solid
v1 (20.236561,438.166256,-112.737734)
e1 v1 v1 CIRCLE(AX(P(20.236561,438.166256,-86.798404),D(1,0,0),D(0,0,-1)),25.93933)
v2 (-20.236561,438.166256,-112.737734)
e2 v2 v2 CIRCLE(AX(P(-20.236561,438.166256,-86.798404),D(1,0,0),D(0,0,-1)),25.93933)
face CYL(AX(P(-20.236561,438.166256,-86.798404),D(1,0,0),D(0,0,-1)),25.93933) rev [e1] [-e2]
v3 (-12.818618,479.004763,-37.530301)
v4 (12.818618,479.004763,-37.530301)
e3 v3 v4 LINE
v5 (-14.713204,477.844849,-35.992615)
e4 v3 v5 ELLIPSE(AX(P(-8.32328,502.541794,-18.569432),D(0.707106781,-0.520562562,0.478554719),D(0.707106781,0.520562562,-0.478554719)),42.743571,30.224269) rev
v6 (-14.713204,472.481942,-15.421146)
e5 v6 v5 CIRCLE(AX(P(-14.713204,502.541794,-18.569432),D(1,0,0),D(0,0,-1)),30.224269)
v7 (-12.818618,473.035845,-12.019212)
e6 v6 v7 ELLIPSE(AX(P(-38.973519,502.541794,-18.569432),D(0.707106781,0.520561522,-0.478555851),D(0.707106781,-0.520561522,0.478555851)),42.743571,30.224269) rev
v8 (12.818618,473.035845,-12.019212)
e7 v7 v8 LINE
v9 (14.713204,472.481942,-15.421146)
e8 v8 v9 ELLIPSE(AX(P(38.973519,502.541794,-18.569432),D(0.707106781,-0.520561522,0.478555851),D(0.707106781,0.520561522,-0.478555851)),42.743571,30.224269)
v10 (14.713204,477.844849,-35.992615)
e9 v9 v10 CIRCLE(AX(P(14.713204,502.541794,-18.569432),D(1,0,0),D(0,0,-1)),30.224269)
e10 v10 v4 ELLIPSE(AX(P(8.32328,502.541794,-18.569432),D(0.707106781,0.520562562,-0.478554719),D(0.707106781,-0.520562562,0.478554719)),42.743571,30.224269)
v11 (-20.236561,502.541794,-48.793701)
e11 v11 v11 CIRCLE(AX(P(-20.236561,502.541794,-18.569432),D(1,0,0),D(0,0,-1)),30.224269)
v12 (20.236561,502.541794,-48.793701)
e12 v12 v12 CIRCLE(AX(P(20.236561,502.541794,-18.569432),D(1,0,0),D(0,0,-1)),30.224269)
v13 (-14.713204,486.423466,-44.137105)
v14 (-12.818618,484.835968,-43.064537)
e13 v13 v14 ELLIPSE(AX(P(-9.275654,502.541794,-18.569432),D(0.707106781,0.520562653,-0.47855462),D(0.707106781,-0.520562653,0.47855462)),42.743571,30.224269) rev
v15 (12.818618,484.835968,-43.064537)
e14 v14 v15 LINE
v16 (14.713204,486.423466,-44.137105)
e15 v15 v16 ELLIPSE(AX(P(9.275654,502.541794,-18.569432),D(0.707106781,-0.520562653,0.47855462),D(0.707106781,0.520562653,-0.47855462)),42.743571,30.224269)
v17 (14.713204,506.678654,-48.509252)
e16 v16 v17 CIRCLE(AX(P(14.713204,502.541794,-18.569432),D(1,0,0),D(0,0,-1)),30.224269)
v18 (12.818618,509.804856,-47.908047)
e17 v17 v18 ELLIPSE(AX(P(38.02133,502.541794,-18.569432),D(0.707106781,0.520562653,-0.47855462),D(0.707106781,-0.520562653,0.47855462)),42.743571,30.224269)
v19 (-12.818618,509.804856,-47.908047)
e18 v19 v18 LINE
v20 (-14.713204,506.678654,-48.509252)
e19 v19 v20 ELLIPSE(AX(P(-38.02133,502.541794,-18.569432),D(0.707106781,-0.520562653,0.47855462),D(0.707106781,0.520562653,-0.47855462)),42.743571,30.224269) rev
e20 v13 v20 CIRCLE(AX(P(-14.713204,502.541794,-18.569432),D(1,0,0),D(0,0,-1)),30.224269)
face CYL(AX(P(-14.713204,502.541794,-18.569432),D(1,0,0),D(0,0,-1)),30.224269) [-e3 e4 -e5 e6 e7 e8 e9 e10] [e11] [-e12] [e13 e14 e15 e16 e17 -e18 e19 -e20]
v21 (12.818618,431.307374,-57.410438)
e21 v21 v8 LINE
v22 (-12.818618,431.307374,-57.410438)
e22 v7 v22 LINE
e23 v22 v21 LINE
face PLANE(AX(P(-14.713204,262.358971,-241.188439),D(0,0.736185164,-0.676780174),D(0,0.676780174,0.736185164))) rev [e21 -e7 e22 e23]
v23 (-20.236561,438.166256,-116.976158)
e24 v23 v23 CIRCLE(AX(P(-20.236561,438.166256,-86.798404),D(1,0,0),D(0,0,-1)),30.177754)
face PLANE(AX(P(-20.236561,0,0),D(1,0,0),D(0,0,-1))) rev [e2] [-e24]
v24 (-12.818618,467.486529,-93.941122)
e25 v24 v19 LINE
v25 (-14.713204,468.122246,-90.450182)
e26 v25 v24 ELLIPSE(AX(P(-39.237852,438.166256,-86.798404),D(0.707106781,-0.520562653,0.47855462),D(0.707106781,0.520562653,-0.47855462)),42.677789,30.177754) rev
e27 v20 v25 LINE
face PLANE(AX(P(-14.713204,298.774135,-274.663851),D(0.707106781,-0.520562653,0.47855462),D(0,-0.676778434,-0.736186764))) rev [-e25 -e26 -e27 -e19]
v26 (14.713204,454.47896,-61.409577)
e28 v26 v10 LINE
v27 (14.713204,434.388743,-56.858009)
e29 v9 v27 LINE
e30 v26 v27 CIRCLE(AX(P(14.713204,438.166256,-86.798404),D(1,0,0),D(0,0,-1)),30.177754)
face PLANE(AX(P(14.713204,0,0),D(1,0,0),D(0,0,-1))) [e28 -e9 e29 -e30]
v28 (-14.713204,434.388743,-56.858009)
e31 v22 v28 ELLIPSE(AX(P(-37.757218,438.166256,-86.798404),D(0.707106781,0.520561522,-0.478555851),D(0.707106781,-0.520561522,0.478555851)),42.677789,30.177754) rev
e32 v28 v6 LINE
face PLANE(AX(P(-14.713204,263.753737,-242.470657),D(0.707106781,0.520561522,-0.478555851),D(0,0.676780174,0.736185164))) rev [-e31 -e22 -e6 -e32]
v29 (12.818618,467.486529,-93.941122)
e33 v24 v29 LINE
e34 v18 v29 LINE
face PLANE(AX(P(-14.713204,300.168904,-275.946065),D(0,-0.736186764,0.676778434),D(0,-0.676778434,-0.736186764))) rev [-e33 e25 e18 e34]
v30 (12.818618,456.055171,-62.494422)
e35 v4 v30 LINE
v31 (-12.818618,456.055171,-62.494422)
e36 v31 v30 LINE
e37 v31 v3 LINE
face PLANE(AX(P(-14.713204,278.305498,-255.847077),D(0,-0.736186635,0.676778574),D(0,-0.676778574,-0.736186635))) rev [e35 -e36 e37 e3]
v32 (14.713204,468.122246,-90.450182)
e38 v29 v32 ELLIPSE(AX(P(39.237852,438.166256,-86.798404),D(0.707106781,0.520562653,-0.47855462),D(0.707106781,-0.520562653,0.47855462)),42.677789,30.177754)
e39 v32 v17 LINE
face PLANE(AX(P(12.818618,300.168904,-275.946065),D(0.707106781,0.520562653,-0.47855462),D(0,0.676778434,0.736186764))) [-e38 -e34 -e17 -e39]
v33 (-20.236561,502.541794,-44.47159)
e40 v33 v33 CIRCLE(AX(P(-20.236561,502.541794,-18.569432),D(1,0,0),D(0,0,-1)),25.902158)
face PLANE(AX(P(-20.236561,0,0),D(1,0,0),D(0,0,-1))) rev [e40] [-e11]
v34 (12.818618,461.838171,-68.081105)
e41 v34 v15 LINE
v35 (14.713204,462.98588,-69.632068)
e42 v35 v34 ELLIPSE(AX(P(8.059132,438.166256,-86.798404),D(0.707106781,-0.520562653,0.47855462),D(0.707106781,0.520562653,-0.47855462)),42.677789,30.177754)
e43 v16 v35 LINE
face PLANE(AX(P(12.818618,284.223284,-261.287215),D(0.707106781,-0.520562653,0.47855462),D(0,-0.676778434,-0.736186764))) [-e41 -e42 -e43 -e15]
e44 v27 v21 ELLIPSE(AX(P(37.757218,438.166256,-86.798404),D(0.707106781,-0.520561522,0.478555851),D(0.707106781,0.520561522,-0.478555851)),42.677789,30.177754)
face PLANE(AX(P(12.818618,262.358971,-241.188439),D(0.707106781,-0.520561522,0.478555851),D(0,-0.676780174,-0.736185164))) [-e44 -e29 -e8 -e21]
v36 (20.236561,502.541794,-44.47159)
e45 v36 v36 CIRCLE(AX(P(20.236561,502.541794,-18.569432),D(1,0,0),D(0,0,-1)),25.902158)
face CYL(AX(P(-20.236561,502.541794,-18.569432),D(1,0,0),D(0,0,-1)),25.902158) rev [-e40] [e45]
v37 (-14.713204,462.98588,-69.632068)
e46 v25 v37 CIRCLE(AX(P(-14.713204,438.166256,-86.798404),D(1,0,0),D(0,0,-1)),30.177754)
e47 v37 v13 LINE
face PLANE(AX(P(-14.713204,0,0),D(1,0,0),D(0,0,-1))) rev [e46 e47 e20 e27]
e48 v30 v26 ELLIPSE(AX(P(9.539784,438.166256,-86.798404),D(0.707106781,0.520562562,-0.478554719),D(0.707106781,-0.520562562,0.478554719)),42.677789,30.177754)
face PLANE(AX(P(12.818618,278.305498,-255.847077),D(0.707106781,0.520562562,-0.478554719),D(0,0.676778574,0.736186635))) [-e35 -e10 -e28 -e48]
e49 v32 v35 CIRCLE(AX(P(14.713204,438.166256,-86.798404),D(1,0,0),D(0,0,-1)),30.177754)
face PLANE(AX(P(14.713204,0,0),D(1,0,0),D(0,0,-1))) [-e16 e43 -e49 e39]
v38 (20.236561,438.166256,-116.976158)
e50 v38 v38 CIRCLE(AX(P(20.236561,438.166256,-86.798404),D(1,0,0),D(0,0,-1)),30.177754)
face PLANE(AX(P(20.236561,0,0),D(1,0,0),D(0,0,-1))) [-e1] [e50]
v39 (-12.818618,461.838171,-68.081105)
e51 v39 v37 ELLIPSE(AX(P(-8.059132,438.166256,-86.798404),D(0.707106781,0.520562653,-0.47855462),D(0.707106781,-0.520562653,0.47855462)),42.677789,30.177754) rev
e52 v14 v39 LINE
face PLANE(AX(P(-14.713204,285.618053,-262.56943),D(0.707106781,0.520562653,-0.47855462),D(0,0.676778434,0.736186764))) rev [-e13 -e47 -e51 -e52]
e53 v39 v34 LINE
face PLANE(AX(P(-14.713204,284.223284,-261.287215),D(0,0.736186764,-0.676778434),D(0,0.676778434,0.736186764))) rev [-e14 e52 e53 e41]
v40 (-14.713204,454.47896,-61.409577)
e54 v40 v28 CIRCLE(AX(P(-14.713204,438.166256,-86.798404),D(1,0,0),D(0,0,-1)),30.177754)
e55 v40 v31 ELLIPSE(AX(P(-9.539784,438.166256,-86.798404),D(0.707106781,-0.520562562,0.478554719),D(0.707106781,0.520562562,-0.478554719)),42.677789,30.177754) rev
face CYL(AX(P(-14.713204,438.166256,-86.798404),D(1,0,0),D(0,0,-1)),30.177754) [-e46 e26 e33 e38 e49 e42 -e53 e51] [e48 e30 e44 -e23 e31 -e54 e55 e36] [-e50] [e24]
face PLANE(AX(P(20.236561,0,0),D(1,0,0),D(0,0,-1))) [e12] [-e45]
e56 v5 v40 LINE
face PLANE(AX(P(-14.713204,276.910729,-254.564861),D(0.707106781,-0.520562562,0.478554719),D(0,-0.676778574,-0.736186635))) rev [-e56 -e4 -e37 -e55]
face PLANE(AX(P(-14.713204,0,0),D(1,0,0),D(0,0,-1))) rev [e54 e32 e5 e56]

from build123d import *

# Parameters (mm, degrees)
BOSS_EXTRUDE2_DEPTH      = 14.713204
BOSS_EXTRUDE2_DEPTH_BACK = 14.713204
BOSS_EXTRUDE3_DEPTH      = 20.236561
BOSS_EXTRUDE3_DEPTH_BACK = 20.236561
SKETCH2_R                = 25.902158
SKETCH2_R_2              = 25.939329669
CUT_EXTRUDE1_DEPTH       = 547.956280292
CHAMFER1_SIZE            = 1.894586


with BuildPart() as part:
    # Sketch1 → Boss-Extrude2 (new, two sides: drawn at the far end of the back side and taken through both)
    with BuildSketch(Plane(origin=(0, 0, 0), x_dir=(0, 0, -1), z_dir=(1, 0, 0)).offset(-BOSS_EXTRUDE2_DEPTH_BACK)):
        with BuildLine():
            ThreePointArc((37.530301218, 479.004762545), (25.455145516, 473.112329842), (12.01921241, 473.035844862))
            Line((12.01921241, 473.035844862), (57.410437724, 431.307373701))
            ThreePointArc((57.410437724, 431.307373701), (57.237962601, 444.238910489), (62.494422204, 456.05517148))
            Line((62.494422204, 456.05517148), (37.530301218, 479.004762545))
        make_face()
        with BuildLine():
            Line((93.941121838, 467.486529022), (47.908047204, 509.804855969))
            ThreePointArc((47.908047204, 509.804855969), (48.571470239, 506.200224369), (48.793700581, 502.541794))
            ThreePointArc((48.793700581, 502.541794), (47.325762011, 493.23696216), (43.064536592, 484.835968341))
            Line((43.064536592, 484.835968341), (68.081105171, 461.838170852))
            ThreePointArc((68.081105171, 461.838170852), (80.358782988, 467.648930733), (93.941121838, 467.486529022))
        make_face()
        with BuildLine():
            Line((0.348742, 483.76459), (12.01921241, 473.035844862))
            ThreePointArc((12.01921241, 473.035844862), (25.455145516, 473.112329842), (37.530301218, 479.004762545))
            Line((37.530301218, 479.004762545), (15.677896, 499.093744))
            Line((15.677896, 499.093744), (0.348742, 483.76459))
        make_face()
        with BuildLine():
            Line((47.908047204, 509.804855969), (36.696142, 520.11199))
            Line((36.696142, 520.11199), (21.366988, 504.782582))
            Line((21.366988, 504.782582), (43.064536592, 484.835968341))
            ThreePointArc((43.064536592, 484.835968341), (47.325762011, 493.23696216), (48.793700581, 502.541794))
            ThreePointArc((48.793700581, 502.541794), (48.571470239, 506.200224369), (47.908047204, 509.804855969))
        make_face()
        with BuildLine():
            Line((21.366988, 504.782582), (36.696142, 520.11199))
            Line((36.696142, 520.11199), (47.908047204, 509.804855969))
            ThreePointArc((47.908047204, 509.804855969), (-3.059663869, 523.653132734), (12.01921241, 473.035844862))
            Line((12.01921241, 473.035844862), (0.348742, 483.76459))
            Line((0.348742, 483.76459), (15.677896, 499.093744))
            Line((15.677896, 499.093744), (37.530301218, 479.004762545))
            ThreePointArc((37.530301218, 479.004762545), (40.492163472, 481.735538786), (43.064536592, 484.835968341))
            Line((43.064536592, 484.835968341), (21.366988, 504.782582))
        make_face()
        with BuildLine():
            ThreePointArc((116.976157863, 438.166256), (110.528637975, 456.809561064), (93.941121838, 467.486529022))
            Line((93.941121838, 467.486529022), (94.929198, 466.578188))
            Line((94.929198, 466.578188), (79.600044, 451.24878))
            Line((79.600044, 451.24878), (68.081105171, 461.838170852))
            ThreePointArc((68.081105171, 461.838170852), (65.094293396, 459.13357369), (62.494422204, 456.05517148))
            Line((62.494422204, 456.05517148), (73.911206, 445.559688))
            Line((73.911206, 445.559688), (58.581798, 430.230534))
            Line((58.581798, 430.230534), (57.410437724, 431.307373701))
            ThreePointArc((57.410437724, 431.307373701), (90.250505926, 408.186599222), (116.976157863, 438.166256))
        make_face()
        with BuildLine():
            Line((94.929198, 466.578188), (93.941121838, 467.486529022))
            ThreePointArc((93.941121838, 467.486529022), (80.358782988, 467.648930733), (68.081105171, 461.838170852))
            Line((68.081105171, 461.838170852), (79.600044, 451.24878))
            Line((79.600044, 451.24878), (94.929198, 466.578188))
        make_face()
        with BuildLine():
            ThreePointArc((62.494422204, 456.05517148), (57.237962601, 444.238910489), (57.410437724, 431.307373701))
            Line((57.410437724, 431.307373701), (58.581798, 430.230534))
            Line((58.581798, 430.230534), (73.911206, 445.559688))
            Line((73.911206, 445.559688), (62.494422204, 456.05517148))
        make_face()
    extrude(amount=BOSS_EXTRUDE2_DEPTH + BOSS_EXTRUDE2_DEPTH_BACK)

    # Sketch1<3> → Boss-Extrude3 (add, two sides: drawn at the far end of the back side and taken through both)
    with BuildSketch(Plane(origin=(0, 0, 0), x_dir=(0, 0, -1), z_dir=(1, 0, 0)).offset(-BOSS_EXTRUDE3_DEPTH_BACK)):
        with BuildLine():
            Line((21.366988, 504.782582), (36.696142, 520.11199))
            Line((36.696142, 520.11199), (47.908047204, 509.804855969))
            ThreePointArc((47.908047204, 509.804855969), (-3.059663869, 523.653132734), (12.01921241, 473.035844862))
            Line((12.01921241, 473.035844862), (0.348742, 483.76459))
            Line((0.348742, 483.76459), (15.677896, 499.093744))
            Line((15.677896, 499.093744), (37.530301218, 479.004762545))
            ThreePointArc((37.530301218, 479.004762545), (40.492163472, 481.735538786), (43.064536592, 484.835968341))
            Line((43.064536592, 484.835968341), (21.366988, 504.782582))
        make_face()
        with BuildLine():
            ThreePointArc((116.976157863, 438.166256), (110.528637975, 456.809561064), (93.941121838, 467.486529022))
            Line((93.941121838, 467.486529022), (94.929198, 466.578188))
            Line((94.929198, 466.578188), (79.600044, 451.24878))
            Line((79.600044, 451.24878), (68.081105171, 461.838170852))
            ThreePointArc((68.081105171, 461.838170852), (65.094293396, 459.13357369), (62.494422204, 456.05517148))
            Line((62.494422204, 456.05517148), (73.911206, 445.559688))
            Line((73.911206, 445.559688), (58.581798, 430.230534))
            Line((58.581798, 430.230534), (57.410437724, 431.307373701))
            ThreePointArc((57.410437724, 431.307373701), (90.250505926, 408.186599222), (116.976157863, 438.166256))
        make_face()
        with BuildLine():
            ThreePointArc((62.494422204, 456.05517148), (57.237962601, 444.238910489), (57.410437724, 431.307373701))
            Line((57.410437724, 431.307373701), (58.581798, 430.230534))
            Line((58.581798, 430.230534), (73.911206, 445.559688))
            Line((73.911206, 445.559688), (62.494422204, 456.05517148))
        make_face()
        with BuildLine():
            Line((94.929198, 466.578188), (93.941121838, 467.486529022))
            ThreePointArc((93.941121838, 467.486529022), (80.358782988, 467.648930733), (68.081105171, 461.838170852))
            Line((68.081105171, 461.838170852), (79.600044, 451.24878))
            Line((79.600044, 451.24878), (94.929198, 466.578188))
        make_face()
        with BuildLine():
            Line((47.908047204, 509.804855969), (36.696142, 520.11199))
            Line((36.696142, 520.11199), (21.366988, 504.782582))
            Line((21.366988, 504.782582), (43.064536592, 484.835968341))
            ThreePointArc((43.064536592, 484.835968341), (47.325762011, 493.23696216), (48.793700581, 502.541794))
            ThreePointArc((48.793700581, 502.541794), (48.571470239, 506.200224369), (47.908047204, 509.804855969))
        make_face()
        with BuildLine():
            Line((0.348742, 483.76459), (12.01921241, 473.035844862))
            ThreePointArc((12.01921241, 473.035844862), (25.455145516, 473.112329842), (37.530301218, 479.004762545))
            Line((37.530301218, 479.004762545), (15.677896, 499.093744))
            Line((15.677896, 499.093744), (0.348742, 483.76459))
        make_face()
    extrude(amount=BOSS_EXTRUDE3_DEPTH + BOSS_EXTRUDE3_DEPTH_BACK)

    # Sketch2 → Cut-Extrude1 (cut, through all)
    with BuildSketch(Plane(origin=(20.236561, 0, 0), x_dir=(0, 0, -1), z_dir=(1, 0, 0))):
        with Locations((18.569432, 502.541794)):
            Circle(SKETCH2_R)
        with Locations((86.798404, 438.166256)):
            Circle(SKETCH2_R_2)
    extrude(amount=-CUT_EXTRUDE1_DEPTH, mode=Mode.SUBTRACT)

    # Chamfer1
    # the kernel refuses this chamfer: 1.894586 mm, written as the material it takes off along each edge
    with BuildSketch(Plane(origin=(-14.713204, 482.302213593, -33.943397788), x_dir=(0.9996219169112971, 0.0202420968703396, -0.018608620176565335), z_dir=(0, -0.6767785744793956, -0.7361866347100016))) as chamfer1_piece_1_section:
        Polygon((CHAMFER1_SIZE * 0.999621916911, CHAMFER1_SIZE * 0.0274958766106), (-CHAMFER1_SIZE * 0.0274958766106, CHAMFER1_SIZE * 0.999621916911), (0, 0), align=None)
    chamfer1_piece_1 = extrude(amount=43.654592913, mode=Mode.PRIVATE)
    chamfer1_piece_1 = chamfer1_piece_1 - Plane(origin=(-14.082586432, 438.166256, -86.798404), x_dir=(0, 0.7844160622334895, 0.6202349887825632), z_dir=(-1, 0, 0)) * Cylinder(30.177753863, 95, mode=Mode.PRIVATE)
    chamfer1_piece_1 = chamfer1_piece_1 - Plane(origin=(-14.082586432, 502.541794, -18.569432), x_dir=(0, -0.7787461057189721, -0.6273392246843295), z_dir=(-1, 0, 0)) * Cylinder(30.224268581, 95, mode=Mode.PRIVATE)
    add(chamfer1_piece_1, mode=Mode.SUBTRACT)
    with BuildSketch(Plane(origin=(14.713204, 513.102306333, -44.321143144), x_dir=(0.027495876610586445, -0.7359084240497759, 0.6765225555604119), z_dir=(0, -0.6767784340411219, -0.7361867638153017))) as chamfer1_piece_2_section:
        Polygon((CHAMFER1_SIZE * 0.999621916911, CHAMFER1_SIZE * 0.0274958766106), (-CHAMFER1_SIZE * 0.0274958766106, CHAMFER1_SIZE * 0.999621916911), (0, 0), align=None)
    chamfer1_piece_2 = extrude(amount=72.273620457, mode=Mode.PRIVATE)
    chamfer1_piece_2 = chamfer1_piece_2 - Plane(origin=(14.076738279, 438.166256, -86.798404), x_dir=(0, 0.7844160622334895, 0.6202349887825632), z_dir=(-1, 0, 0)) * Cylinder(30.177753863, 153, mode=Mode.PRIVATE)
    chamfer1_piece_2 = chamfer1_piece_2 - Plane(origin=(14.076738279, 502.541794, -18.569432), x_dir=(0, -0.7787461057189721, -0.6273392246843295), z_dir=(-1, 0, 0)) * Cylinder(30.224268581, 153, mode=Mode.PRIVATE)
    add(chamfer1_piece_2, mode=Mode.SUBTRACT)
    with BuildSketch(Plane(origin=(14.713204, 458.540720488, -71.668009231), x_dir=(-0.9996219169112969, -0.02024210042020755, 0.018608616315095913), z_dir=(0, 0.6767784340411188, 0.7361867638153047))) as chamfer1_piece_3_section:
        Polygon((CHAMFER1_SIZE * 0.999621916911, -CHAMFER1_SIZE * 0.0274958766106), (-CHAMFER1_SIZE * 0.0274958766106, -CHAMFER1_SIZE * 0.999621916911), (0, 0), align=None)
    chamfer1_piece_3 = extrude(amount=43.725829206, mode=Mode.PRIVATE)
    chamfer1_piece_3 = chamfer1_piece_3 - Plane(origin=(14.082637489, 438.166256, -86.798404), x_dir=(0, 0.7844160622334895, 0.6202349887825632), z_dir=(-1, 0, 0)) * Cylinder(30.177753863, 96, mode=Mode.PRIVATE)
    chamfer1_piece_3 = chamfer1_piece_3 - Plane(origin=(14.082637489, 502.541794, -18.569432), x_dir=(0, -0.7787461057189721, -0.6273392246843295), z_dir=(-1, 0, 0)) * Cylinder(30.224268581, 96, mode=Mode.PRIVATE)
    add(chamfer1_piece_3, mode=Mode.SUBTRACT)
    with BuildSketch(Plane(origin=(14.713204, 452.757720432, -66.081325634), x_dir=(-0.9996219169112969, 0.02024209687034323, -0.01860862017656867), z_dir=(0, 0.6767785744793956, 0.7361866347100016))) as chamfer1_piece_4_section:
        Polygon((CHAMFER1_SIZE * 0.999621916911, CHAMFER1_SIZE * 0.0274958766106), (-CHAMFER1_SIZE * 0.0274958766106, CHAMFER1_SIZE * 0.999621916911), (0, 0), align=None)
    chamfer1_piece_4 = extrude(amount=43.654592913, mode=Mode.PRIVATE)
    chamfer1_piece_4 = chamfer1_piece_4 - Plane(origin=(14.082586432, 438.166256, -86.798404), x_dir=(0, 0.7844160622334895, 0.6202349887825632), z_dir=(-1, 0, 0)) * Cylinder(30.177753863, 95, mode=Mode.PRIVATE)
    chamfer1_piece_4 = chamfer1_piece_4 - Plane(origin=(14.082586432, 502.541794, -18.569432), x_dir=(0, -0.7787461057189721, -0.6273392246843295), z_dir=(-1, 0, 0)) * Cylinder(30.224268581, 95, mode=Mode.PRIVATE)
    add(chamfer1_piece_4, mode=Mode.SUBTRACT)
    with BuildSketch(Plane(origin=(-14.713204, 464.189078658, -97.528025897), x_dir=(-0.0274958766105856, -0.735908424049776, 0.6765225555604119), z_dir=(0, 0.6767784340411219, 0.7361867638153017))) as chamfer1_piece_5_section:
        Polygon((CHAMFER1_SIZE * 0.999621916911, CHAMFER1_SIZE * 0.0274958766106), (-CHAMFER1_SIZE * 0.0274958766106, CHAMFER1_SIZE * 0.999621916911), (0, 0), align=None)
    chamfer1_piece_5 = extrude(amount=72.273620457, mode=Mode.PRIVATE)
    chamfer1_piece_5 = chamfer1_piece_5 - Plane(origin=(-14.076738279, 438.166256, -86.798404), x_dir=(0, 0.7844160622334895, 0.6202349887825632), z_dir=(-1, 0, 0)) * Cylinder(30.177753863, 153, mode=Mode.PRIVATE)
    chamfer1_piece_5 = chamfer1_piece_5 - Plane(origin=(-14.076738279, 502.541794, -18.569432), x_dir=(0, -0.7787461057189721, -0.6273392246843295), z_dir=(-1, 0, 0)) * Cylinder(30.224268581, 153, mode=Mode.PRIVATE)
    add(chamfer1_piece_5, mode=Mode.SUBTRACT)
    with BuildSketch(Plane(origin=(14.713204, 428.009914857, -60.997333989), x_dir=(-0.9996219169112965, -0.0202420564302285, 0.01860866416646602), z_dir=(0, 0.6767801743515941, 0.7361851639394983))) as chamfer1_piece_6_section:
        Polygon((CHAMFER1_SIZE * 0.999621916911, -CHAMFER1_SIZE * 0.0274958766106), (-CHAMFER1_SIZE * 0.0274958766106, -CHAMFER1_SIZE * 0.999621916911), (0, 0), align=None)
    chamfer1_piece_6 = extrude(amount=71.401897808, mode=Mode.PRIVATE)
    chamfer1_piece_6 = chamfer1_piece_6 - Plane(origin=(14.076843775, 438.166256, -86.798404), x_dir=(0, 0.7844160622334895, 0.6202349887825632), z_dir=(-1, 0, 0)) * Cylinder(30.177753863, 151, mode=Mode.PRIVATE)
    chamfer1_piece_6 = chamfer1_piece_6 - Plane(origin=(14.076843775, 502.541794, -18.569432), x_dir=(0, -0.7787461057189721, -0.6273392246843295), z_dir=(-1, 0, 0)) * Cylinder(30.224268581, 151, mode=Mode.PRIVATE)
    add(chamfer1_piece_6, mode=Mode.SUBTRACT)
    with BuildSketch(Plane(origin=(-14.713204, 476.333303705, -8.432316145), x_dir=(-0.027495876610586514, 0.7359068247788585, -0.6765242952129021), z_dir=(0, -0.6767801743515941, -0.7361851639394983))) as chamfer1_piece_7_section:
        Polygon((CHAMFER1_SIZE * 0.999621916911, CHAMFER1_SIZE * 0.0274958766106), (-CHAMFER1_SIZE * 0.0274958766106, CHAMFER1_SIZE * 0.999621916911), (0, 0), align=None)
    chamfer1_piece_7 = extrude(amount=71.401897808, mode=Mode.PRIVATE)
    chamfer1_piece_7 = chamfer1_piece_7 - Plane(origin=(-14.076843775, 438.166256, -86.798404), x_dir=(0, 0.7844160622334895, 0.6202349887825632), z_dir=(-1, 0, 0)) * Cylinder(30.177753863, 151, mode=Mode.PRIVATE)
    chamfer1_piece_7 = chamfer1_piece_7 - Plane(origin=(-14.076843775, 502.541794, -18.569432), x_dir=(0, -0.7787461057189721, -0.6273392246843295), z_dir=(-1, 0, 0)) * Cylinder(30.224268581, 151, mode=Mode.PRIVATE)
    add(chamfer1_piece_7, mode=Mode.SUBTRACT)
    with BuildSketch(Plane(origin=(-14.713204, 488.133418705, -39.477632533), x_dir=(0.999621916911297, -0.020242100420206275, 0.01860861631509474), z_dir=(0, -0.6767784340411188, -0.7361867638153047))) as chamfer1_piece_8_section:
        Polygon((CHAMFER1_SIZE * 0.999621916911, -CHAMFER1_SIZE * 0.0274958766106), (-CHAMFER1_SIZE * 0.0274958766106, -CHAMFER1_SIZE * 0.999621916911), (0, 0), align=None)
    chamfer1_piece_8 = extrude(amount=43.725829206, mode=Mode.PRIVATE)
    chamfer1_piece_8 = chamfer1_piece_8 - Plane(origin=(-14.082637489, 438.166256, -86.798404), x_dir=(0, 0.7844160622334895, 0.6202349887825632), z_dir=(-1, 0, 0)) * Cylinder(30.177753863, 96, mode=Mode.PRIVATE)
    chamfer1_piece_8 = chamfer1_piece_8 - Plane(origin=(-14.082637489, 502.541794, -18.569432), x_dir=(0, -0.7787461057189721, -0.6273392246843295), z_dir=(-1, 0, 0)) * Cylinder(30.224268581, 96, mode=Mode.PRIVATE)
    add(chamfer1_piece_8, mode=Mode.SUBTRACT)


solid = part.part
